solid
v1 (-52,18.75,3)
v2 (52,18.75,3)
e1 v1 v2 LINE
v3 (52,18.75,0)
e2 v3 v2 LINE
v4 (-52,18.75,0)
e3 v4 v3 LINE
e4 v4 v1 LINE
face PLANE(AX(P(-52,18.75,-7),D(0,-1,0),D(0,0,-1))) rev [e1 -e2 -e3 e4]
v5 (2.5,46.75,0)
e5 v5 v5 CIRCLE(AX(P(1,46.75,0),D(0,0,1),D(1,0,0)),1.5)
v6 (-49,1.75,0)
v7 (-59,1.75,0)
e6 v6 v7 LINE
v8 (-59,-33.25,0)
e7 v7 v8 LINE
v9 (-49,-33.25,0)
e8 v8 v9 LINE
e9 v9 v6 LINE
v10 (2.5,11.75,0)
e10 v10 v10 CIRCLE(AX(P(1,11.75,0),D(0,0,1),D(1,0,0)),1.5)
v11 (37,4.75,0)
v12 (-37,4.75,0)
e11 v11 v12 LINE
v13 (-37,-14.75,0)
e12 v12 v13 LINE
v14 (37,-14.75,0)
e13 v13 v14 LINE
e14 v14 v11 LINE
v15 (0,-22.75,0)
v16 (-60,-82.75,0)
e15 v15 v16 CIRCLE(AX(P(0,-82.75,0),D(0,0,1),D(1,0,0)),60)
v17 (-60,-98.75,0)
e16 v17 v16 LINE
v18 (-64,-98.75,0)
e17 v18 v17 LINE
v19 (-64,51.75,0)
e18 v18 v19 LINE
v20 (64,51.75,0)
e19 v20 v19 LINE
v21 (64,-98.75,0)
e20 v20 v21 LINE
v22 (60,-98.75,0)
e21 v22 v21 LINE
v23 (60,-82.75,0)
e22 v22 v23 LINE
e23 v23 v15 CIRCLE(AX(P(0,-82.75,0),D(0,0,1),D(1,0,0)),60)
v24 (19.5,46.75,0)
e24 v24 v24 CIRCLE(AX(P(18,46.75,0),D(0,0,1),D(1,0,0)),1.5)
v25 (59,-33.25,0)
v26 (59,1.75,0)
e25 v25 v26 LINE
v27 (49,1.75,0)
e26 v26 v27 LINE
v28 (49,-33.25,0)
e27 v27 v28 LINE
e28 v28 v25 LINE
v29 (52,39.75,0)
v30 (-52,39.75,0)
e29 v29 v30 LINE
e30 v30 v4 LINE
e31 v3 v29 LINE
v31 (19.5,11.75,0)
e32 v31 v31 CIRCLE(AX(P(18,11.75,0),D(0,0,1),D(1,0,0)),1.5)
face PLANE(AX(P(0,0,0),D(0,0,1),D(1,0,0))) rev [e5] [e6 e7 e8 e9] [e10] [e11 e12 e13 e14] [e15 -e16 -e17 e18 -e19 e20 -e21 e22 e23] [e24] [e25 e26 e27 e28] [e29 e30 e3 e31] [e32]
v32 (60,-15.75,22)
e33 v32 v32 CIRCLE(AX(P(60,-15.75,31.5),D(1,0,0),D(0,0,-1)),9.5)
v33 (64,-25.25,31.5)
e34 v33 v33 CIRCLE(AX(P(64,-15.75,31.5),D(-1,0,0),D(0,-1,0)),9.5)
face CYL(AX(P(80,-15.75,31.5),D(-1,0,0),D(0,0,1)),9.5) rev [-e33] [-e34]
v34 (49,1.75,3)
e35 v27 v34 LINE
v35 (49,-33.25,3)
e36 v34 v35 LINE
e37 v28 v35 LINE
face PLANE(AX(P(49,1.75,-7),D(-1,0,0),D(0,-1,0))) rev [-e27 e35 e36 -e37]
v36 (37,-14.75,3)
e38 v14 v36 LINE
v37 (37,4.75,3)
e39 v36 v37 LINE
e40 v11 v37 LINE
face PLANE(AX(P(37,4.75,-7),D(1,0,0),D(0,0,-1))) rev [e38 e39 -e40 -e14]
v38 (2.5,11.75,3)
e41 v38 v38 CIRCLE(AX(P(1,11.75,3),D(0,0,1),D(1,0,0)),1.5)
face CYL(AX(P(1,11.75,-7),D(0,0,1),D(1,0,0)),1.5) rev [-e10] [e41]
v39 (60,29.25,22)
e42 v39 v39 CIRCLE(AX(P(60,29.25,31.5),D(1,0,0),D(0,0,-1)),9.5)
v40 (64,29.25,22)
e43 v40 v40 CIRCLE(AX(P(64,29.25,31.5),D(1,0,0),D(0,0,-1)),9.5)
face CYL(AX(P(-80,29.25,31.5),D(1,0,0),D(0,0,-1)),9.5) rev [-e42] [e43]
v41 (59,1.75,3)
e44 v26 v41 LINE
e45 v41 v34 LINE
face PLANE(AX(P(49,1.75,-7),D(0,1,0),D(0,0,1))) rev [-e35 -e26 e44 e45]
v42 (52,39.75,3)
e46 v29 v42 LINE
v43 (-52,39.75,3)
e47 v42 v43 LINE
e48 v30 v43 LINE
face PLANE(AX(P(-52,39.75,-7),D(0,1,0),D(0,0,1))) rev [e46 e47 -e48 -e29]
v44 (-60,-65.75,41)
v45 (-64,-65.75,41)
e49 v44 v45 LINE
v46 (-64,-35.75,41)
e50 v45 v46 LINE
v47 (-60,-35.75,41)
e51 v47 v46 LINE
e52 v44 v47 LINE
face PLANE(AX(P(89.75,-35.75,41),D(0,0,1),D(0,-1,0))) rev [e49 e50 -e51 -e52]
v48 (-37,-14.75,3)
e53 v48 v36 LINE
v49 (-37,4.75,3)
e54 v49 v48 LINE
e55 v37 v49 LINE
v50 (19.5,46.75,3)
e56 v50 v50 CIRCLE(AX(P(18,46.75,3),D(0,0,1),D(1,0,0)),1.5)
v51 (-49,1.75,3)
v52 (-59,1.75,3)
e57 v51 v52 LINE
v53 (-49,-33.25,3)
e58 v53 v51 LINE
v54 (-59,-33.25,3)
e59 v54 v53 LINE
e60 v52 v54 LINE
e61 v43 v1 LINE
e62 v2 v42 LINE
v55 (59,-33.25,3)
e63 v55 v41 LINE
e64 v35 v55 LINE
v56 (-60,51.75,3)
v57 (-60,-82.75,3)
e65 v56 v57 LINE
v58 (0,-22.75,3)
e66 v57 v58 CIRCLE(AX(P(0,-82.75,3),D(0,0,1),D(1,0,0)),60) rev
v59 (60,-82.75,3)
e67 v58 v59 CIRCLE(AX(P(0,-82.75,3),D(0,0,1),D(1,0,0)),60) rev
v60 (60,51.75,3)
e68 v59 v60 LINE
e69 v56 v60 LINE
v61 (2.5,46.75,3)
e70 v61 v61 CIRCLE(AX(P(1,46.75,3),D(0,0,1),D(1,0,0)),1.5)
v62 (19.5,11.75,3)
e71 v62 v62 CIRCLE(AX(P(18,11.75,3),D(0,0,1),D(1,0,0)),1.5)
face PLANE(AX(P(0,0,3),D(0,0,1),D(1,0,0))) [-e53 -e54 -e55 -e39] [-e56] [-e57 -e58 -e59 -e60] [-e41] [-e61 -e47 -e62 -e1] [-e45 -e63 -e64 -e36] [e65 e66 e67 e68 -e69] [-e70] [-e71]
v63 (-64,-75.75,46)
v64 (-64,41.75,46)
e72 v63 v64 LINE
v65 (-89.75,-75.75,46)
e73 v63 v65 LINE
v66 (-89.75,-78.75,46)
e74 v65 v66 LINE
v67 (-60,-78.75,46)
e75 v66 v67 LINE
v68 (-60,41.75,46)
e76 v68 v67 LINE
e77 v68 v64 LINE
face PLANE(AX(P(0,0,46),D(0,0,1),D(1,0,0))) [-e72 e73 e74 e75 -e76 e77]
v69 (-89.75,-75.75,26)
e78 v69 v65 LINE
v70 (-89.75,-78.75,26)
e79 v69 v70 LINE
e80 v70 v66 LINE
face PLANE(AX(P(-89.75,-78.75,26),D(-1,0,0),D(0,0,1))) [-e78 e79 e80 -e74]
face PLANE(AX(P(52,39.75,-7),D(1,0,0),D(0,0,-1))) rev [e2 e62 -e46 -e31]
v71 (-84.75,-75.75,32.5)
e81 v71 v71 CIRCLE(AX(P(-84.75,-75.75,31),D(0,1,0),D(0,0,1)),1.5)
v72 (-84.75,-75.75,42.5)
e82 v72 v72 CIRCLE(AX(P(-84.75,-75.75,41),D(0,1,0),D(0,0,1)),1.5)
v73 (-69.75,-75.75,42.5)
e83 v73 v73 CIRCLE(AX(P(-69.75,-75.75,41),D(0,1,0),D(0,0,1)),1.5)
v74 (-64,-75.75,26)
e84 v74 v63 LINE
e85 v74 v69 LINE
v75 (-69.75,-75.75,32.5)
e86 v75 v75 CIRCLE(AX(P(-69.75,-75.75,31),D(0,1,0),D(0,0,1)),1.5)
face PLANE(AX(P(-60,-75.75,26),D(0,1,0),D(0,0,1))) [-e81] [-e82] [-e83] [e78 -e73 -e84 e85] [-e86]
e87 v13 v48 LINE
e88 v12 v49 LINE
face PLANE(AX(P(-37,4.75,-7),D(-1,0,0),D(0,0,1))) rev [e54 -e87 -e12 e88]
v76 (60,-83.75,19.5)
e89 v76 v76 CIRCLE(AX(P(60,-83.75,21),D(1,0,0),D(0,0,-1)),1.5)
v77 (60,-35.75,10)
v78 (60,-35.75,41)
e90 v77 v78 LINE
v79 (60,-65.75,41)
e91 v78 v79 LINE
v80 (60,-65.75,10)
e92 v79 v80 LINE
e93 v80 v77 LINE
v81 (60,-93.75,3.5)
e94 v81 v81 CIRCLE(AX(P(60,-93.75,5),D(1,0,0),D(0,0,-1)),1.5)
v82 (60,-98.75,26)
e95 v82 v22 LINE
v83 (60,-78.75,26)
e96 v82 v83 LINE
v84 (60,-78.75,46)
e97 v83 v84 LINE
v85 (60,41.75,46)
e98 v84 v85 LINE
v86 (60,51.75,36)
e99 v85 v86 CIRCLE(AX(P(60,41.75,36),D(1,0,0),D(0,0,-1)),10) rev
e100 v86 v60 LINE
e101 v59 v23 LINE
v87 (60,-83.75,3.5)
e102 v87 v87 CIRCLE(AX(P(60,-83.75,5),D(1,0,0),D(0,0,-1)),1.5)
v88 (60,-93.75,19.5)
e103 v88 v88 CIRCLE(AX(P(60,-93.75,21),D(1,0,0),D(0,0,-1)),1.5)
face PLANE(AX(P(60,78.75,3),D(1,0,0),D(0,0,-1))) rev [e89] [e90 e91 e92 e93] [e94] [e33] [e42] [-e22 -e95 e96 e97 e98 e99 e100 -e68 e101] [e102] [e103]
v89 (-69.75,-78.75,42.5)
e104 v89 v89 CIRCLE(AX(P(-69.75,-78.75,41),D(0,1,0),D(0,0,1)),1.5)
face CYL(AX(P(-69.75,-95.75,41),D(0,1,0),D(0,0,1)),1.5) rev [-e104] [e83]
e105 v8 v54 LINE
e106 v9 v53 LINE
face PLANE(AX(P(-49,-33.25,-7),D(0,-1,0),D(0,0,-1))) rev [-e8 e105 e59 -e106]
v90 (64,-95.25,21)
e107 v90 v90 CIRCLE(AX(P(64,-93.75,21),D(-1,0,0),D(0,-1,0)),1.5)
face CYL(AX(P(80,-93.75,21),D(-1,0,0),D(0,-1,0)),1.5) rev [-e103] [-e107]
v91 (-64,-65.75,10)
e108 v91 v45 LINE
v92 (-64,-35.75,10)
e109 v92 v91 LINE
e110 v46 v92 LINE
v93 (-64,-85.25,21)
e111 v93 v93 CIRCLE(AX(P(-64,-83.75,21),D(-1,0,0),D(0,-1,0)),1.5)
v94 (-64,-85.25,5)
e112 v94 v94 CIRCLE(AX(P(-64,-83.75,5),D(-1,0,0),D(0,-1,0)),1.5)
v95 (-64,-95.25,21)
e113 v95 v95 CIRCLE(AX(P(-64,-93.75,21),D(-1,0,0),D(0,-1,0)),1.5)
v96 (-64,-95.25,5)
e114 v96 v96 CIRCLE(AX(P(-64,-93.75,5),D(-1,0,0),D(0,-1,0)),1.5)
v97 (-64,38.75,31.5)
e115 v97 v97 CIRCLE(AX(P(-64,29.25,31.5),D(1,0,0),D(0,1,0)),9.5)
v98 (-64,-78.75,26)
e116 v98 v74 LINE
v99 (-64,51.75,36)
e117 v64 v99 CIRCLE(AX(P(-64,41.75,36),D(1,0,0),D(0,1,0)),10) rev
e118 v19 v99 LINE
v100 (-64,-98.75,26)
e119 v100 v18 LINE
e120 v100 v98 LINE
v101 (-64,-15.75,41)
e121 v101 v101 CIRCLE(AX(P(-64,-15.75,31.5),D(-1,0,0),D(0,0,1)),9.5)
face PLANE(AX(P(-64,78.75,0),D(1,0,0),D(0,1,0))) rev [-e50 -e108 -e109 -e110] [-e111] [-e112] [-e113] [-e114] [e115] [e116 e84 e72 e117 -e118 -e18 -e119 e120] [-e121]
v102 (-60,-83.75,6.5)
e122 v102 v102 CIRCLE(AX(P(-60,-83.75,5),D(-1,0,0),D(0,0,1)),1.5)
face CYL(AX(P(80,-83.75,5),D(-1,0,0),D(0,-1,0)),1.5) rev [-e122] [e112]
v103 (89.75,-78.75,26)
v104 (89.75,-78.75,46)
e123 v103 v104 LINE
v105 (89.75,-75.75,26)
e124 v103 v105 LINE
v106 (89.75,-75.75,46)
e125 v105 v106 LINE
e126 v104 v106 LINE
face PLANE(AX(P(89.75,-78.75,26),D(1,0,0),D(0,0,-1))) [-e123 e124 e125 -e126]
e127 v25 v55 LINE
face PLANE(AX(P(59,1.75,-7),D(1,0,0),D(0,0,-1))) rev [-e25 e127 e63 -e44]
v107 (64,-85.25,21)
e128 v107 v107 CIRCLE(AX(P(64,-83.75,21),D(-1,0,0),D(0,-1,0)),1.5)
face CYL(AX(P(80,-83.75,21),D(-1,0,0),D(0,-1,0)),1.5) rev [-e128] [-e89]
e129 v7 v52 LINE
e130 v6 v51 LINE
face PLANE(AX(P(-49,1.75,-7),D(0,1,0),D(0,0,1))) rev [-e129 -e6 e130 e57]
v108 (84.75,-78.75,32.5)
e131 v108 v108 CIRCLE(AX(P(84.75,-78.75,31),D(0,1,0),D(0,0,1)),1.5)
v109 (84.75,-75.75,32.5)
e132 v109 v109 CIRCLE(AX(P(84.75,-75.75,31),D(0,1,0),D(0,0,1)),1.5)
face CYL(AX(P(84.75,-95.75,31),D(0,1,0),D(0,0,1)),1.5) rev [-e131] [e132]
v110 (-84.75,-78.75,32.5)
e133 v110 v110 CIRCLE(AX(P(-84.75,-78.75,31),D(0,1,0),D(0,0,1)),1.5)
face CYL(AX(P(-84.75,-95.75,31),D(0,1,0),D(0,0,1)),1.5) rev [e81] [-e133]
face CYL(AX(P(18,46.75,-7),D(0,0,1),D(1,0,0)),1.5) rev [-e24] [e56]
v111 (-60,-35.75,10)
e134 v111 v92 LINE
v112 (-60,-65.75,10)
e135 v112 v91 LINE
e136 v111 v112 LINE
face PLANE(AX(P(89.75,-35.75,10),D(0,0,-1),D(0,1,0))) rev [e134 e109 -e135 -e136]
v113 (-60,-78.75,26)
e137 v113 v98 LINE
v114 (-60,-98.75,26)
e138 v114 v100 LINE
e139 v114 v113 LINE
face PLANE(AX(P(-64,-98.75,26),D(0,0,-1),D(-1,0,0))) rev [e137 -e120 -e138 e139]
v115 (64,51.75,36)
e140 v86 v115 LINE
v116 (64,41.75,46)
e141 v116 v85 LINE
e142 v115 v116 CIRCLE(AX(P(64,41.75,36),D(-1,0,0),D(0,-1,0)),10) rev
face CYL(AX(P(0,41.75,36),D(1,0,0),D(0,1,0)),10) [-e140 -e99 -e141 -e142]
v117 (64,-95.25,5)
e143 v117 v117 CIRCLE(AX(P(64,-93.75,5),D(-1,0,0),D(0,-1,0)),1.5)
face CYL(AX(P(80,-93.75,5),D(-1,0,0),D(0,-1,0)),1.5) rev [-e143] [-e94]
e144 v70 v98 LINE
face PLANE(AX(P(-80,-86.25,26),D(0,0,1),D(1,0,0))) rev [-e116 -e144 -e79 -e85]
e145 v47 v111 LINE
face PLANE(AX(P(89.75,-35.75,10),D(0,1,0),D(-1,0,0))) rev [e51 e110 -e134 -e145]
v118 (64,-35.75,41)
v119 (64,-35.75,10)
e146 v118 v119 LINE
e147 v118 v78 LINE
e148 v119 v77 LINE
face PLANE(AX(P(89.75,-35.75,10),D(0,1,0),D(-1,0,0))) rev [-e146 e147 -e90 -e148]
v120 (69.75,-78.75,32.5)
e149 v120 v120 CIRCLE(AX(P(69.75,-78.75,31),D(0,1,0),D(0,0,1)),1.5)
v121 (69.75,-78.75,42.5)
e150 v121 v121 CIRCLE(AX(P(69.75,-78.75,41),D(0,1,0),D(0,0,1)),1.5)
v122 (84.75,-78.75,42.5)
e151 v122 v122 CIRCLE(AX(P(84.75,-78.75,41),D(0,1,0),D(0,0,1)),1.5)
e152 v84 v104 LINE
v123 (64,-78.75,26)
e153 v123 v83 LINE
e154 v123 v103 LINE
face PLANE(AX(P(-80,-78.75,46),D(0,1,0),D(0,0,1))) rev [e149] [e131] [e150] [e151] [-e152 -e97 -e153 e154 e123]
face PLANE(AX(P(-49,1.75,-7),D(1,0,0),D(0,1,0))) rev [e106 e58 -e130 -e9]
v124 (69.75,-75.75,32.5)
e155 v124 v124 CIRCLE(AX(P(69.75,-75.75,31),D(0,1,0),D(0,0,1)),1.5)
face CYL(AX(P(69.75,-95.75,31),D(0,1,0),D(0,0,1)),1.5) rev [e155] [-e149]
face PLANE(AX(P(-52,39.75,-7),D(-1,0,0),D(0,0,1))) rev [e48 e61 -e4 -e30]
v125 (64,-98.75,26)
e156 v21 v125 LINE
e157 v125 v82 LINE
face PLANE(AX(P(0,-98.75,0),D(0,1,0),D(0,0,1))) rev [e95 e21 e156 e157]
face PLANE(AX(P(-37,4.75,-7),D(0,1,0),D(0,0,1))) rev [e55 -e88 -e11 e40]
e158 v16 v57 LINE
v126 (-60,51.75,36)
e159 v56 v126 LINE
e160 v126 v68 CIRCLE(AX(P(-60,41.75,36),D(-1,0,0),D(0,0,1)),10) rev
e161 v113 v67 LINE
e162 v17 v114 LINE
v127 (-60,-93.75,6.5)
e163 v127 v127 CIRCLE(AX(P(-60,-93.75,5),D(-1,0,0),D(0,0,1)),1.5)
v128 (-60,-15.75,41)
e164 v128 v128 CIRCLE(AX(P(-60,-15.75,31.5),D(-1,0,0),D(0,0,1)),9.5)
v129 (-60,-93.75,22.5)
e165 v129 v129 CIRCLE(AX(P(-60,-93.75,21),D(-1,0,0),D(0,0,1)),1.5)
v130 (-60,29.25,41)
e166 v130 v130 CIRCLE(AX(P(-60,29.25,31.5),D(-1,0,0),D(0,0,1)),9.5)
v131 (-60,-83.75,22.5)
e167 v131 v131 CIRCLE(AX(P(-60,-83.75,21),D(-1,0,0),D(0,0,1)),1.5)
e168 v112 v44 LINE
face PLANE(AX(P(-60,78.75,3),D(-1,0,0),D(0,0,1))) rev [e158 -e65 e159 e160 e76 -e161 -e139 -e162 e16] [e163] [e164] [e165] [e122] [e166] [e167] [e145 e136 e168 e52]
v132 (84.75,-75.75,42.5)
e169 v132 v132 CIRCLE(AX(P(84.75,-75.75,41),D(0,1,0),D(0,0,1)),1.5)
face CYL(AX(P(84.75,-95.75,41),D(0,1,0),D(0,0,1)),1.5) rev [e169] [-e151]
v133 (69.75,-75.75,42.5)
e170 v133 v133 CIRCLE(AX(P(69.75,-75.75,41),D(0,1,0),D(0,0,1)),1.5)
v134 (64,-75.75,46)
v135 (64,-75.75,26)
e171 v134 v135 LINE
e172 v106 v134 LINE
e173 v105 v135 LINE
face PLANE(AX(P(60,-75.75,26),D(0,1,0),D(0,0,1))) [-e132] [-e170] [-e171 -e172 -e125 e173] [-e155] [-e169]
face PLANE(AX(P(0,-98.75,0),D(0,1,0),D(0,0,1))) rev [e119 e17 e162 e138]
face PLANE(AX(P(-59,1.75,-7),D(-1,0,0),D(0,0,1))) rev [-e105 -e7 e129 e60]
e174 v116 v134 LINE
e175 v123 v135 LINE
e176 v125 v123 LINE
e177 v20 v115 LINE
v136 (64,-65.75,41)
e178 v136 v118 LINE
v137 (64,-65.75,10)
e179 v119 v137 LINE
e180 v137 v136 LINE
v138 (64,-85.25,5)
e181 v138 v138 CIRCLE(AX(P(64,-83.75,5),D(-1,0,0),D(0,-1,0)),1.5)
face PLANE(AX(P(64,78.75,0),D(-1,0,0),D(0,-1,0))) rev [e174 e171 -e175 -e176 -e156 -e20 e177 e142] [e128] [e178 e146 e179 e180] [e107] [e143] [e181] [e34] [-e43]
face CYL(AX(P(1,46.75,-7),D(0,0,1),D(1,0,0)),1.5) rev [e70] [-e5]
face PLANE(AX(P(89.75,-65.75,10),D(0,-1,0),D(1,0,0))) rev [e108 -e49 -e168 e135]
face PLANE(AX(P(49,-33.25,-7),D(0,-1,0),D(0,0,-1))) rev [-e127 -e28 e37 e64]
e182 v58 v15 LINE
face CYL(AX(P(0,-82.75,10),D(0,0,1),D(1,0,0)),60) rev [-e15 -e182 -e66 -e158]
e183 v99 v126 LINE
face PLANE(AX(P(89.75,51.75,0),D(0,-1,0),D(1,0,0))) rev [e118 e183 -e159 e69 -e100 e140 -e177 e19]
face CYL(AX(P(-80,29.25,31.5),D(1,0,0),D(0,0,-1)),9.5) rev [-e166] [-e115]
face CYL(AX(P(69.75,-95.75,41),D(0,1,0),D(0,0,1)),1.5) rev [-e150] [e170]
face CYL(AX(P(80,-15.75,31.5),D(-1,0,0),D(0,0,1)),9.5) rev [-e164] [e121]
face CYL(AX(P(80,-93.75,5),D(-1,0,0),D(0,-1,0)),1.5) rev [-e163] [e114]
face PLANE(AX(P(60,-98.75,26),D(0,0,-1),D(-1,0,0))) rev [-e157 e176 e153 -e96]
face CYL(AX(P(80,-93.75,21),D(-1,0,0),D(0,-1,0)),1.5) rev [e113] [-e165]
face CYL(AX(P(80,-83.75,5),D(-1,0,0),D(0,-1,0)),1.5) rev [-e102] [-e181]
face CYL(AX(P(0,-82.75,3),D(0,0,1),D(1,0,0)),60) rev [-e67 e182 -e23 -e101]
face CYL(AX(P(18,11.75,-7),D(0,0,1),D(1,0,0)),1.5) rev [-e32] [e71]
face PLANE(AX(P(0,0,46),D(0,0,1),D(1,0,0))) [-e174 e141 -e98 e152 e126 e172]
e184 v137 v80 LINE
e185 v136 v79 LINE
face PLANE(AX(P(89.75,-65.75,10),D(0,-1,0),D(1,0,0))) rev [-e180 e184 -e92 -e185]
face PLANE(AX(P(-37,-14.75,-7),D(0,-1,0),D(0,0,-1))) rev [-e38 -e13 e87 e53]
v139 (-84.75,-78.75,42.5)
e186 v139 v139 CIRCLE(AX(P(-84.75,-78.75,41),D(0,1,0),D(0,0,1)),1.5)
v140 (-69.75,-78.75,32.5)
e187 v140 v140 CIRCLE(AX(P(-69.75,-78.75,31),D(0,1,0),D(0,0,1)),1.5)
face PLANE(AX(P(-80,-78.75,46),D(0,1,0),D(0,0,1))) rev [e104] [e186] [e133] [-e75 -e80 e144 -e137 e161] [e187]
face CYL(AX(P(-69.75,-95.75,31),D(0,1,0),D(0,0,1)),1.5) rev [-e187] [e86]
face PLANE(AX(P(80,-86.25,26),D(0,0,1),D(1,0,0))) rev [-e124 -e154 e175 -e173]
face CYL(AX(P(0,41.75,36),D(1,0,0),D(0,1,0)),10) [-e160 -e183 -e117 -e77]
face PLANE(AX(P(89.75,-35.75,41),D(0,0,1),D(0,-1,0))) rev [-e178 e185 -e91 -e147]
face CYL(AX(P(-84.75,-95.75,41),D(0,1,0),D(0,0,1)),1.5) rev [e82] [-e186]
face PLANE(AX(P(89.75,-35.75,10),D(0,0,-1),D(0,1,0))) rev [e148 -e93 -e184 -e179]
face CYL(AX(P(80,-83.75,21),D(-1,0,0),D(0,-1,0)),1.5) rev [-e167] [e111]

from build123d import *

# Parameters (mm, degrees)
SKETCH_1_W           = 160
SKETCH_1_H           = 157.5
EXTRUDE_1_DEPTH      = 46
SKETCH_2_W           = 120
SKETCH_2_H           = 157.5
CUT_EXTRUDE_1_DEPTH  = 43
SKETCH_3_W           = 16
SKETCH_3_H           = 155
CUT_EXTRUDE_2_DEPTH  = 122.31596144
SKETCH_4_R           = 9.5
CUT_EXTRUDE_3_DEPTH  = 171.451056025
SKETCH_5_R           = 9.5
CUT_EXTRUDE_4_DEPTH  = 171.451056025
SKETCH_7_R           = 1.5
CUT_EXTRUDE_6_DEPTH  = 10
SKETCH_10_W          = 16
SKETCH_10_H          = 26
CUT_EXTRUDE_9_DEPTH  = 10
SKETCH_11_W          = 4
SKETCH_11_H          = 26
EXTRUDE_2_DEPTH      = 20
SKETCH_13_R          = 1.5
CUT_EXTRUDE_11_DEPTH = 181.564566014
SKETCH_17_W          = 29.75
SKETCH_17_H          = 3
EXTRUDE_3_DEPTH      = 20
SKETCH_18_R          = 1.5
CUT_EXTRUDE_14_DEPTH = 20
SKETCH_19_W          = 46
SKETCH_19_H          = 27
CUT_EXTRUDE_15_DEPTH = 189.432016919
SKETCH_20_R          = 30
CUT_EXTRUDE_16_DEPTH = 10
SKETCH_21_W          = 120
SKETCH_21_H          = 56.000000256
CUT_EXTRUDE_17_DEPTH = 10
FILLET_1_R           = 60
SKETCH_22_W          = 10
SKETCH_22_H          = 35
CUT_EXTRUDE_18_DEPTH = 10
FILLET_2_R           = 10
SKETCH_24_W          = 31
SKETCH_24_H          = 30
CUT_EXTRUDE_19_DEPTH = 189.432016919
SKETCH_25_W          = 104
SKETCH_25_H          = 21
SKETCH_25_W_2        = 74
SKETCH_25_H_2        = 19.499999744
CUT_EXTRUDE_20_DEPTH = 10


with BuildPart() as part:
    # 草图1 → 凸台-拉伸1 (new body)
    with BuildSketch(Plane.XY):
        Rectangle(SKETCH_1_W, SKETCH_1_H)
    extrude(amount=EXTRUDE_1_DEPTH)

    # 草图2 → 切除-拉伸1 (cut)
    with BuildSketch(Plane.XY.offset(46)):
        Rectangle(SKETCH_2_W, SKETCH_2_H)
    extrude(amount=-CUT_EXTRUDE_1_DEPTH, mode=Mode.SUBTRACT)

    # 草图3 → 切除-拉伸2 (cut, through all)
    with BuildSketch(Plane.XY.offset(46)):
        with Locations((-72, 1.25)):
            Rectangle(SKETCH_3_W, SKETCH_3_H)
        with Locations((72, 1.25)):
            Rectangle(SKETCH_3_W, SKETCH_3_H)
    extrude(amount=-CUT_EXTRUDE_2_DEPTH, mode=Mode.SUBTRACT)

    # 草图4 → 切除-拉伸3 (cut, through all)
    with BuildSketch(Plane.ZY.offset(64)):
        with Locations((31.5, -15.75)):
            Circle(SKETCH_4_R)
    extrude(amount=-CUT_EXTRUDE_3_DEPTH, mode=Mode.SUBTRACT)

    # 草图5 → 切除-拉伸4 (cut, through all)
    with BuildSketch(Plane(origin=(64, 0, 0), x_dir=(0, 0, -1), z_dir=(1, 0, 0))):
        with Locations(Location((-31.5, 29.25, 0), (0, 0, 90))):
            Circle(SKETCH_5_R)
    extrude(amount=-CUT_EXTRUDE_4_DEPTH, mode=Mode.SUBTRACT)

    # 草图7 → 切除-拉伸6 (cut)
    with BuildSketch(Plane.XY.offset(3)):
        with Locations((1, 46.75)):
            Circle(SKETCH_7_R)
        with Locations((18, 46.75)):
            Circle(SKETCH_7_R)
        with Locations((1, 11.75)):
            Circle(SKETCH_7_R)
        with Locations((18, 11.75)):
            Circle(SKETCH_7_R)
    extrude(amount=-CUT_EXTRUDE_6_DEPTH, mode=Mode.SUBTRACT)

    # 草图10 → 切除-拉伸9 (cut)
    with BuildSketch(Plane(origin=(0, -76.25, 0), x_dir=(1, 0, 0), z_dir=(0, 1, 0))):
        with Locations((-72, -13)):
            Rectangle(SKETCH_10_W, SKETCH_10_H)
        with Locations((72, -13)):
            Rectangle(SKETCH_10_W, SKETCH_10_H)
    extrude(amount=-CUT_EXTRUDE_9_DEPTH, mode=Mode.SUBTRACT)

    # 草图11 → 凸台-拉伸2 (add)
    with BuildSketch(Plane.XZ.offset(78.75)):
        with Locations((-62, 13)):
            Rectangle(SKETCH_11_W, SKETCH_11_H)
        with Locations((62, 13)):
            Rectangle(SKETCH_11_W, SKETCH_11_H)
    extrude(amount=EXTRUDE_2_DEPTH)

    # 草图13 → 切除-拉伸11 (cut, through all)
    with BuildSketch(Plane.ZY.offset(64)):
        with Locations(Location((5, -83.75, 0), (0, 0, 270))):
            Circle(SKETCH_13_R)
        with Locations(Location((21, -83.75, 0), (0, 0, 270))):
            Circle(SKETCH_13_R)
        with Locations(Location((21, -93.75, 0), (0, 0, 270))):
            Circle(SKETCH_13_R)
        with Locations(Location((5, -93.75, 0), (0, 0, 270))):
            Circle(SKETCH_13_R)
    extrude(amount=-CUT_EXTRUDE_11_DEPTH, mode=Mode.SUBTRACT)

    # 草图17 → 凸台-拉伸3 (add)
    with BuildSketch(Plane.XY.offset(46)):
        with Locations((-74.875, -77.25)):
            Rectangle(SKETCH_17_W, SKETCH_17_H)
        with Locations((74.875, -77.25)):
            Rectangle(SKETCH_17_W, SKETCH_17_H)
    extrude(amount=-EXTRUDE_3_DEPTH)

    # 草图18 → 切除-拉伸14 (cut)
    with BuildSketch(Plane(origin=(0, -75.75, 0), x_dir=(1, 0, 0), z_dir=(0, 1, 0))):
        with Locations(Location((84.75, -31, 0), (0, 0, 270))):
            Circle(SKETCH_18_R)
        with Locations(Location((84.75, -41, 0), (0, 0, 270))):
            Circle(SKETCH_18_R)
        with Locations(Location((69.75, -31, 0), (0, 0, 270))):
            Circle(SKETCH_18_R)
        with Locations(Location((69.75, -41, 0), (0, 0, 270))):
            Circle(SKETCH_18_R)
        with Locations(Location((-69.75, -31, 0), (0, 0, 270))):
            Circle(SKETCH_18_R)
        with Locations(Location((-69.75, -41, 0), (0, 0, 270))):
            Circle(SKETCH_18_R)
        with Locations(Location((-84.75, -41, 0), (0, 0, 270))):
            Circle(SKETCH_18_R)
        with Locations(Location((-84.75, -31, 0), (0, 0, 270))):
            Circle(SKETCH_18_R)
    extrude(amount=-CUT_EXTRUDE_14_DEPTH, mode=Mode.SUBTRACT)

    # 草图19 → 切除-拉伸15 (cut, through all)
    with BuildSketch(Plane.ZY.offset(64)):
        with Locations((23, 65.25)):
            Rectangle(SKETCH_19_W, SKETCH_19_H)
    extrude(amount=-CUT_EXTRUDE_15_DEPTH, mode=Mode.SUBTRACT)

    # 草图20 → 切除-拉伸16 (cut)
    with BuildSketch(Plane.XY.offset(3)):
        with Locations((5.442e-06, -52.749999744)):
            Circle(SKETCH_20_R)
    extrude(amount=-CUT_EXTRUDE_16_DEPTH, mode=Mode.SUBTRACT)

    # 草图21 → 切除-拉伸17 (cut)
    with BuildSketch(Plane(origin=(0, 0, 0), x_dir=(-1, 0, 0), z_dir=(0, 0, -1))):
        with Locations((0, -50.749999872)):
            Rectangle(SKETCH_21_W, SKETCH_21_H)
    extrude(amount=-CUT_EXTRUDE_17_DEPTH, mode=Mode.SUBTRACT)

    # 圆角1
    fillet_1_edges = [part.edges().sort_by_distance(p)[0] for p in [
        (60, -22.749999744, 1.5),
        (-60, -22.749999744, 1.5),
    ]]
    fillet(fillet_1_edges, radius=FILLET_1_R - 0.0001)  # a hair under: the kernel refuses the full size

    # 草图22 → 切除-拉伸18 (cut)
    with BuildSketch(Plane.XY.offset(3)):
        with Locations((54, -15.75)):
            Rectangle(SKETCH_22_W, SKETCH_22_H)
        with Locations((-54, -15.75)):
            Rectangle(SKETCH_22_W, SKETCH_22_H)
    extrude(amount=-CUT_EXTRUDE_18_DEPTH, mode=Mode.SUBTRACT)

    # 圆角2
    fillet_2_edges = [part.edges().sort_by_distance(p)[0] for p in [
        (62, 51.75, 46),
        (-62, 51.75, 46),
    ]]
    fillet(fillet_2_edges, radius=FILLET_2_R)

    # 草图24 → 切除-拉伸19 (cut, through all)
    with BuildSketch(Plane.ZY.offset(64)):
        with Locations((25.5, -50.75)):
            Rectangle(SKETCH_24_W, SKETCH_24_H)
    extrude(amount=-CUT_EXTRUDE_19_DEPTH, mode=Mode.SUBTRACT)

    # 草图25 → 切除-拉伸20 (cut)
    with BuildSketch(Plane.XY.offset(3)):
        with Locations((0, 29.25)):
            Rectangle(SKETCH_25_W, SKETCH_25_H)
        with Locations((0, -4.999999872)):
            Rectangle(SKETCH_25_W_2, SKETCH_25_H_2)
    extrude(amount=-CUT_EXTRUDE_20_DEPTH, mode=Mode.SUBTRACT)


solid = part.part
